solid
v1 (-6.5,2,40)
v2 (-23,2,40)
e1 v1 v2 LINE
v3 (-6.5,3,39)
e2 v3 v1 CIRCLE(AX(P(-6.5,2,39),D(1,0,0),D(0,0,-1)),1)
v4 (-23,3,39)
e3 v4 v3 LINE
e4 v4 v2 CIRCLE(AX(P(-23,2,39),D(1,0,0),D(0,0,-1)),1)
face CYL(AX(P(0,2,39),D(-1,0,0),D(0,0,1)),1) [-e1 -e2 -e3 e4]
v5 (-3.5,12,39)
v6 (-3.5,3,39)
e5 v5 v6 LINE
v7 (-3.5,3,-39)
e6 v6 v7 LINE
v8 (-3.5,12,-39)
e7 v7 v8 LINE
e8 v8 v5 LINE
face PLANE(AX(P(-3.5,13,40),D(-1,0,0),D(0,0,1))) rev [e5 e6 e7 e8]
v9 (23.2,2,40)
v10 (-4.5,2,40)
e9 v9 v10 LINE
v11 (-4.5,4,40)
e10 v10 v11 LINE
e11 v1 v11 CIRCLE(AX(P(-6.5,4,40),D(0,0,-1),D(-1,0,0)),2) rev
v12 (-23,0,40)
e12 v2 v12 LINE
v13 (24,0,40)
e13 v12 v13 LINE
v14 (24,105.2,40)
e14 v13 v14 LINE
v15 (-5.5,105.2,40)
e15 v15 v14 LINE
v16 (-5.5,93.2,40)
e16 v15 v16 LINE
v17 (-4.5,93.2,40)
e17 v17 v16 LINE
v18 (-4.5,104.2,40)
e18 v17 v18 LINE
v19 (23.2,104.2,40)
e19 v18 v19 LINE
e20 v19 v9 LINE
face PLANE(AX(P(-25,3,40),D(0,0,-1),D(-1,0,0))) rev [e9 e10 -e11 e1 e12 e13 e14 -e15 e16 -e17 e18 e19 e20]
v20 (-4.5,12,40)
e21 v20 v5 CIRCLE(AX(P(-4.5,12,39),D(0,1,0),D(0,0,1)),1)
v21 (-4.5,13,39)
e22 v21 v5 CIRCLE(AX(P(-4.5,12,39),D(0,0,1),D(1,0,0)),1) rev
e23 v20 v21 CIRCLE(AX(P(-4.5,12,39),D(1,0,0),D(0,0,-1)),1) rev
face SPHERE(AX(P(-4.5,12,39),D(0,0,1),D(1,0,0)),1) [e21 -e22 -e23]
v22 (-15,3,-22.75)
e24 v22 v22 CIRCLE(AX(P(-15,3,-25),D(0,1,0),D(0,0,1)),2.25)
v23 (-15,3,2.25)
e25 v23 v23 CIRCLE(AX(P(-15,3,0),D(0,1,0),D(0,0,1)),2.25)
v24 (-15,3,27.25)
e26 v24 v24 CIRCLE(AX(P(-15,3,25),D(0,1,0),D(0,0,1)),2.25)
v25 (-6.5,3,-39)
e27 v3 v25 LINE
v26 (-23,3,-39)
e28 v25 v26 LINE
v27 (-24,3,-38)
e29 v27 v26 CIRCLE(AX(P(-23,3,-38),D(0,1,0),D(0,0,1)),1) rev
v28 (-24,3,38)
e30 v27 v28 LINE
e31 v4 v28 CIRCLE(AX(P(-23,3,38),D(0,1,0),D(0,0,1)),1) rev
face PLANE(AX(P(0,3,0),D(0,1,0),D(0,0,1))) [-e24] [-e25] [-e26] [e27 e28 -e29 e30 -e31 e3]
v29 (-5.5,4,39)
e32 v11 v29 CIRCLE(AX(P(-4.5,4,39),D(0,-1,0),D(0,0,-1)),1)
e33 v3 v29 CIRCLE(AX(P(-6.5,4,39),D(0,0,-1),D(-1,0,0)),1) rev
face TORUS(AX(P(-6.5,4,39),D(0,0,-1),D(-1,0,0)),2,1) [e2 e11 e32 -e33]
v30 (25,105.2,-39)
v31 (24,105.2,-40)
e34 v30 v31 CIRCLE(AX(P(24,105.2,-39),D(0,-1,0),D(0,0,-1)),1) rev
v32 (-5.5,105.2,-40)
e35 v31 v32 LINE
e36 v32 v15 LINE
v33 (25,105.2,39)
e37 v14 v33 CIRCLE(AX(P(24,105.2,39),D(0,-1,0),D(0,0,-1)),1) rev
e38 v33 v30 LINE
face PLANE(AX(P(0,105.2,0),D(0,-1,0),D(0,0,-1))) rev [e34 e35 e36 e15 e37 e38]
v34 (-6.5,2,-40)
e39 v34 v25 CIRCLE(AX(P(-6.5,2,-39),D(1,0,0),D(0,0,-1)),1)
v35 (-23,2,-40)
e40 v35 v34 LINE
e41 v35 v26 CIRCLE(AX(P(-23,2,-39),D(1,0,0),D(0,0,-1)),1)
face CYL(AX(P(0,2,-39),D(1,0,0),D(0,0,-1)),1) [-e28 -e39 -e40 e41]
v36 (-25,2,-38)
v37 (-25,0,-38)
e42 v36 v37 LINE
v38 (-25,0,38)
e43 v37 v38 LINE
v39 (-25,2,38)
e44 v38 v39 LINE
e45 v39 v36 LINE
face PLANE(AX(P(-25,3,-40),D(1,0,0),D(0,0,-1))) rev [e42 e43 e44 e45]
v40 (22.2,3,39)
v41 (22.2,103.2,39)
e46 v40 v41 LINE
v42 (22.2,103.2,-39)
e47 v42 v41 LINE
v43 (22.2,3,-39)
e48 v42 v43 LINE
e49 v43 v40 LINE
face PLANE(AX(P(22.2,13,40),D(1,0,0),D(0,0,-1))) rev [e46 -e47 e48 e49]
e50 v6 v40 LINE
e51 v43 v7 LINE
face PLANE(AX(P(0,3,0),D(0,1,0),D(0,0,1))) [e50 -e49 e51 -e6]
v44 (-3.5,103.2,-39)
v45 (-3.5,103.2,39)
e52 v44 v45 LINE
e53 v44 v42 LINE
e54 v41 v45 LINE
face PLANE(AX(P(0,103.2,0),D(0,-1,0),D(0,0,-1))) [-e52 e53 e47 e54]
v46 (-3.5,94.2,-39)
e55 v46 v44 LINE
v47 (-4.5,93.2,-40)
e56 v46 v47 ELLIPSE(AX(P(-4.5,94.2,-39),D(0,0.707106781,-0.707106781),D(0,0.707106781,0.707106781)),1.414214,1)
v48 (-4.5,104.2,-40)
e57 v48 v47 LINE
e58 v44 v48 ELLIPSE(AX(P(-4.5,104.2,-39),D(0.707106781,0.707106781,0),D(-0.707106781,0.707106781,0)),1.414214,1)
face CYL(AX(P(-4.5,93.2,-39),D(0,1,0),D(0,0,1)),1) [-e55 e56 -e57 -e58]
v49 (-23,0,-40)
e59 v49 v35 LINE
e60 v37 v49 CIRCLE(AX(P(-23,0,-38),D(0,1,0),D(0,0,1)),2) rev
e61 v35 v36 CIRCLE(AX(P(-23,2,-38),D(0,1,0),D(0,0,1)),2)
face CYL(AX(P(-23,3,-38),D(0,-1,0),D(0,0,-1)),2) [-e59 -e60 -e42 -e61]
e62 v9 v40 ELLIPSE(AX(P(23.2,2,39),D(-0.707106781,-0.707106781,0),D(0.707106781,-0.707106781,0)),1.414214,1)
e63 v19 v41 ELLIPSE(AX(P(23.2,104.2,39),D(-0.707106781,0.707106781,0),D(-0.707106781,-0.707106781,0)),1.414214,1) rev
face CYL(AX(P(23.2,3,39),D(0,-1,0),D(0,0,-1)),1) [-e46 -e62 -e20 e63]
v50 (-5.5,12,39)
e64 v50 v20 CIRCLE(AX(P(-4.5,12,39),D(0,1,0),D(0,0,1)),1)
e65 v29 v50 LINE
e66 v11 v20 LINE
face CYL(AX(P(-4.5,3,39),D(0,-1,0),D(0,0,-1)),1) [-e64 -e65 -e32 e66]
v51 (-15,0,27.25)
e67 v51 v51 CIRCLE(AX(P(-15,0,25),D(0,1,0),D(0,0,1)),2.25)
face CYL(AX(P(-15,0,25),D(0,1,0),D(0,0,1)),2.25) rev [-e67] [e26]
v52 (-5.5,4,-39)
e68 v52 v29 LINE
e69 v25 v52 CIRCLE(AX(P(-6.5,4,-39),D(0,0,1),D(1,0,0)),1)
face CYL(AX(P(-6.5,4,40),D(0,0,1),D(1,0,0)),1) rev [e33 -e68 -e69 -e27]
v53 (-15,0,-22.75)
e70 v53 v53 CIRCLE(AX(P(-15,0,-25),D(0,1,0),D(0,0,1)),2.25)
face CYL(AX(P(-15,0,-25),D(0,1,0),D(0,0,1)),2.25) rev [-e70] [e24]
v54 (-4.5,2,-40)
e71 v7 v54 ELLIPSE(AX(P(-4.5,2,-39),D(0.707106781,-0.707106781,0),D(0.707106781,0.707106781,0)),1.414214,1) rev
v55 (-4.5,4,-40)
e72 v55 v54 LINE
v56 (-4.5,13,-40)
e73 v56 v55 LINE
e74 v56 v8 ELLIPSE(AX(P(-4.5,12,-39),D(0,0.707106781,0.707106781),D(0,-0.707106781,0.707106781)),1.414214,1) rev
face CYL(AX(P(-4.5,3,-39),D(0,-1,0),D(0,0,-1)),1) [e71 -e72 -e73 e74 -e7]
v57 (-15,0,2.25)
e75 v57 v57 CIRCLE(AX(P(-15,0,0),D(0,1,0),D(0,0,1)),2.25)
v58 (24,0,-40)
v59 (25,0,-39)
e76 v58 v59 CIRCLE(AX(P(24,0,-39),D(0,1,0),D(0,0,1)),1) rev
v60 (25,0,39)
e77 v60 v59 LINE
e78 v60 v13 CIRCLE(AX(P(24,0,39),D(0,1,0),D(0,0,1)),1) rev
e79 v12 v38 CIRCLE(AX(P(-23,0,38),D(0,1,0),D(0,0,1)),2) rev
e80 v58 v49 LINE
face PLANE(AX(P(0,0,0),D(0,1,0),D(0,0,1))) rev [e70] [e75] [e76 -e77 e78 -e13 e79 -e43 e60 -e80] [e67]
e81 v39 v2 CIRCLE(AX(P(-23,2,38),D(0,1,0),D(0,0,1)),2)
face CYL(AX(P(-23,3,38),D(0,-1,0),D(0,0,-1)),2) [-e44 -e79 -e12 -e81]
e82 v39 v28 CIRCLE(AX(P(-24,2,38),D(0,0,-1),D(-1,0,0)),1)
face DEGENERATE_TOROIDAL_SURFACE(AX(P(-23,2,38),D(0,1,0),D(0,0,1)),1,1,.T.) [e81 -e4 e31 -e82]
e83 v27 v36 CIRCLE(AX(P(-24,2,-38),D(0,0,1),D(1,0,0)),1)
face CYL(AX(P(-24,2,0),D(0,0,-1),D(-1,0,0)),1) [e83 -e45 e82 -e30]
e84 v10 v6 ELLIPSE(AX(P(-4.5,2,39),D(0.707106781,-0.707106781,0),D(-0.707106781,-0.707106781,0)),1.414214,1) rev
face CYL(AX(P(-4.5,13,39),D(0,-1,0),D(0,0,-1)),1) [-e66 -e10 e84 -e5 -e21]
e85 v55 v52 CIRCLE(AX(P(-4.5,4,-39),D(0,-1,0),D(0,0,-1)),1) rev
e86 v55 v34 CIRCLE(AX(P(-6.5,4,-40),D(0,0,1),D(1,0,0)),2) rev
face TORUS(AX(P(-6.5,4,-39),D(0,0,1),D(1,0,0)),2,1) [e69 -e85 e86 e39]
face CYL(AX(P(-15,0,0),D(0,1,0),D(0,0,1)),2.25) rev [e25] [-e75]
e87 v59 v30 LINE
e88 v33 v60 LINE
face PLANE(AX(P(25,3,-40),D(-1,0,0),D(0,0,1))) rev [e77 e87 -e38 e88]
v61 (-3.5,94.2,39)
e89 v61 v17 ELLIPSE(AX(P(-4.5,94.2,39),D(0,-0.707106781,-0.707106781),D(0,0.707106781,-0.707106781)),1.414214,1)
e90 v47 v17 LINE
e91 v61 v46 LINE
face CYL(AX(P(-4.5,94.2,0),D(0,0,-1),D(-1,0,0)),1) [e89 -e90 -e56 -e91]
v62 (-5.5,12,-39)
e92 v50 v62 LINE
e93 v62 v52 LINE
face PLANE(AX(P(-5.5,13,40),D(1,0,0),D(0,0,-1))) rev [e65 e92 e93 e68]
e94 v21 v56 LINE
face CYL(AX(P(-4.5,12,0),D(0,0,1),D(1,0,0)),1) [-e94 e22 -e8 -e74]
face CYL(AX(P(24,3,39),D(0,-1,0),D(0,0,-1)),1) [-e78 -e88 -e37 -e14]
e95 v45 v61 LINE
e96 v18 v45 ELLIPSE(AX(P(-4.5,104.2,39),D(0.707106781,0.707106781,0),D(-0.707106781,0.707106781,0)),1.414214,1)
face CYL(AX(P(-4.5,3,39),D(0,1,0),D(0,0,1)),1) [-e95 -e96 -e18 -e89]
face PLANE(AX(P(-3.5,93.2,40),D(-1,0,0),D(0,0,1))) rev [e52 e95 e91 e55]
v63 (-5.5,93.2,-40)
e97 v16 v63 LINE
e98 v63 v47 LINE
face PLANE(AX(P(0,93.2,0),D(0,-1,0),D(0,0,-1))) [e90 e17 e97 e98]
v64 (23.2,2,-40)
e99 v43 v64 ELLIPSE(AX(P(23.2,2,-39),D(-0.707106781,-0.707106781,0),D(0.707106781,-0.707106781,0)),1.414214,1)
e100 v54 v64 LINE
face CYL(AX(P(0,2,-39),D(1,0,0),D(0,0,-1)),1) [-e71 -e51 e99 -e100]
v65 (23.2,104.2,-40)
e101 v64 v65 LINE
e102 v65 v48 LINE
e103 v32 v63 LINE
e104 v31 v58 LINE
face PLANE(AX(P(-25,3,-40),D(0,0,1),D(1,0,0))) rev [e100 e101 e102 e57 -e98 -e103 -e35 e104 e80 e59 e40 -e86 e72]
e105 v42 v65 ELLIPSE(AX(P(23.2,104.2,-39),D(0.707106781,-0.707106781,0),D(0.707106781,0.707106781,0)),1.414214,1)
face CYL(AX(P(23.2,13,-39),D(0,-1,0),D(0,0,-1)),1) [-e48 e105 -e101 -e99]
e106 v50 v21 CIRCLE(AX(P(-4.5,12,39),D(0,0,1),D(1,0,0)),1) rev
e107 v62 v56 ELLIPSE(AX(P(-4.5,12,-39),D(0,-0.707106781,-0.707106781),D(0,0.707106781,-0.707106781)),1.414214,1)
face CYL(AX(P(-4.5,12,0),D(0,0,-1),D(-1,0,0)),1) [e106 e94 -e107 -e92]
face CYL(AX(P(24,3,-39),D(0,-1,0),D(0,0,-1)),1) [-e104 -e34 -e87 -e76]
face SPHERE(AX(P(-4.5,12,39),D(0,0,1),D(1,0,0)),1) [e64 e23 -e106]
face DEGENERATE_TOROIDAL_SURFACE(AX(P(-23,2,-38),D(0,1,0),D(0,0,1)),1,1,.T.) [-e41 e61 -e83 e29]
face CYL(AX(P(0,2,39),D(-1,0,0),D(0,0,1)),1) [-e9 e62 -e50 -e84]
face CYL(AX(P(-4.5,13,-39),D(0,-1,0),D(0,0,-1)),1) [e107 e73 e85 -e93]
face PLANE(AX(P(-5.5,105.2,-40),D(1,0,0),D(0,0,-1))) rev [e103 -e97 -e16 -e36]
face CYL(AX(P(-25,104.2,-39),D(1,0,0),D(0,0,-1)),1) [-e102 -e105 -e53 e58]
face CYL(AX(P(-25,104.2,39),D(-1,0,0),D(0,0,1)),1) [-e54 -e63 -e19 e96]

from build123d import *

# Parameters (mm, degrees)
SKETCH1_W           = 50
SKETCH1_H           = 80
BOSS_EXTRUDE1_DEPTH = 3
SKETCH2_R           = 2.25
CUT_EXTRUDE1_DEPTH  = 48.265209192
SKETCH3_W           = 2.8
SKETCH3_H           = 80
SKETCH3_W_2         = 2
BOSS_EXTRUDE2_DEPTH = 10
SKETCH4_W           = 2.8
SKETCH4_H           = 80
BOSS_EXTRUDE3_DEPTH = 90.2
SKETCH5_W           = 30.5
SKETCH5_H           = 80
BOSS_EXTRUDE4_DEPTH = 2
SKETCH6_W           = 2
SKETCH6_H           = 80
BOSS_EXTRUDE5_DEPTH = 10
FILLET1_R           = 1
FILLET2_R           = 2


# Some blends are built 0.0001 mm under size
with BuildPart() as part:
    # Sketch1 → Boss-Extrude1 (new body)
    with BuildSketch(Plane(origin=(0, 0, 0), x_dir=(1, 0, 0), z_dir=(0, 1, 0))):
        Rectangle(SKETCH1_W, SKETCH1_H)
    extrude(amount=BOSS_EXTRUDE1_DEPTH)

    # Sketch2 → Cut-Extrude1 (cut, through all)
    with BuildSketch(Plane(origin=(0, 3, 0), x_dir=(1, 0, 0), z_dir=(0, 1, 0))):
        with Locations(Location((-15, 0, 0), (0, 0, 270))):
            Circle(SKETCH2_R)
        with Locations(Location((-15, 25, 0), (0, 0, 270))):
            Circle(SKETCH2_R)
        with Locations(Location((-15, -25, 0), (0, 0, 270))):
            Circle(SKETCH2_R)
    extrude(amount=-CUT_EXTRUDE1_DEPTH, mode=Mode.SUBTRACT)

    # Sketch3 → Boss-Extrude2 (add)
    with BuildSketch(Plane(origin=(0, 3, 0), x_dir=(1, 0, 0), z_dir=(0, 1, 0))):
        with Locations((23.6, 0)):
            Rectangle(SKETCH3_W, SKETCH3_H)
        with Locations((-4.5, 0)):
            Rectangle(SKETCH3_W_2, SKETCH3_H)
    extrude(amount=BOSS_EXTRUDE2_DEPTH)

    # Sketch4 → Boss-Extrude3 (add)
    with BuildSketch(Plane(origin=(0, 13, 0), x_dir=(1, 0, 0), z_dir=(0, 1, 0))):
        with Locations((23.6, 0)):
            Rectangle(SKETCH4_W, SKETCH4_H)
    extrude(amount=BOSS_EXTRUDE3_DEPTH)

    # Sketch5 → Boss-Extrude4 (add)
    with BuildSketch(Plane(origin=(0, 103.2, 0), x_dir=(1, 0, 0), z_dir=(0, 1, 0))):
        with Locations((9.75, 0)):
            Rectangle(SKETCH5_W, SKETCH5_H)
    extrude(amount=BOSS_EXTRUDE4_DEPTH)

    # Sketch6 → Boss-Extrude5 (add)
    with BuildSketch(Plane.XZ.offset(-103.2)):
        with Locations((-4.5, 0)):
            Rectangle(SKETCH6_W, SKETCH6_H)
    extrude(amount=BOSS_EXTRUDE5_DEPTH)

    # Fillet1
    fillet1_edges = [part.edges().sort_by_distance(p)[0] for p in [
        (-25, 3, 0),
        (-15.25, 3, 40),
        (9.35, 3, -40),
        (22.2, 53.1, 40),
        (22.2, 53.1, -40),
        (-15.25, 3, -40),
        (9.35, 3, 40),
        (-5.5, 8, 40),
        (-3.5, 8, 40),
        (-3.5, 8, -40),
        (-5.5, 3, 0),
        (-5.5, 8, -40),
        (-4.5, 13, 40),
        (-3.5, 13, 0),
        (-5.5, 13, 0),
        (9.35, 103.2, -40),
        (25, 52.6, 40),
        (25, 52.6, -40),
        (9.35, 103.2, 40),
        (-3.5, 98.2, -40),
        (-3.5, 98.2, 40),
        (-3.5, 93.2, 0),
    ]]
    fillet(fillet1_edges, radius=FILLET1_R - 0.0001)  # a hair under: the kernel refuses the full size

    # Fillet2
    # the kernel refuses this fillet: 2 mm, written as the material it takes off along each edge
    with BuildSketch(Plane(origin=(-23, 3, 38), x_dir=(-1, 0, 0), z_dir=(0, 0, -1))) as fillet2_piece_1:
        with BuildLine():
            CenterArc((1.0001, -0.9999), 0.9999, 0, 90)
            Line((2, -0.9999), (2, 0))
            Line((2, 0), (1.0001, 0))
        make_face()
    revolve(axis=Axis((-23, 3, 38), (0, 1, 0)), revolution_arc=90, mode=Mode.SUBTRACT)
    with BuildSketch(Plane(origin=(-23, 3, -38), x_dir=(0, 0, -1), z_dir=(1, 0, 0))) as fillet2_piece_2:
        with BuildLine():
            CenterArc((1.0001, -0.9999), 0.9999, 0, 90)
            Line((2, -0.9999), (2, 0))
            Line((2, 0), (1.0001, 0))
        make_face()
    revolve(axis=Axis((-23, 3, -38), (0, 1, 0)), revolution_arc=90, mode=Mode.SUBTRACT)
    with BuildSketch(Plane(origin=(-25, -5, 40), x_dir=(0, 0, -1), z_dir=(0, 1, 0)), Plane(origin=(-25, -5, -40), x_dir=(1, 0, 0), z_dir=(0, 1, 0))) as fillet2_piece_3:
        with BuildLine():
            CenterArc((FILLET2_R, -FILLET2_R), FILLET2_R, 90, 90)
            Line((0, -FILLET2_R), (0, 0))
            Line((0, 0), (FILLET2_R, 0))
        make_face()
    extrude(amount=8, mode=Mode.SUBTRACT)


solid = part.part
